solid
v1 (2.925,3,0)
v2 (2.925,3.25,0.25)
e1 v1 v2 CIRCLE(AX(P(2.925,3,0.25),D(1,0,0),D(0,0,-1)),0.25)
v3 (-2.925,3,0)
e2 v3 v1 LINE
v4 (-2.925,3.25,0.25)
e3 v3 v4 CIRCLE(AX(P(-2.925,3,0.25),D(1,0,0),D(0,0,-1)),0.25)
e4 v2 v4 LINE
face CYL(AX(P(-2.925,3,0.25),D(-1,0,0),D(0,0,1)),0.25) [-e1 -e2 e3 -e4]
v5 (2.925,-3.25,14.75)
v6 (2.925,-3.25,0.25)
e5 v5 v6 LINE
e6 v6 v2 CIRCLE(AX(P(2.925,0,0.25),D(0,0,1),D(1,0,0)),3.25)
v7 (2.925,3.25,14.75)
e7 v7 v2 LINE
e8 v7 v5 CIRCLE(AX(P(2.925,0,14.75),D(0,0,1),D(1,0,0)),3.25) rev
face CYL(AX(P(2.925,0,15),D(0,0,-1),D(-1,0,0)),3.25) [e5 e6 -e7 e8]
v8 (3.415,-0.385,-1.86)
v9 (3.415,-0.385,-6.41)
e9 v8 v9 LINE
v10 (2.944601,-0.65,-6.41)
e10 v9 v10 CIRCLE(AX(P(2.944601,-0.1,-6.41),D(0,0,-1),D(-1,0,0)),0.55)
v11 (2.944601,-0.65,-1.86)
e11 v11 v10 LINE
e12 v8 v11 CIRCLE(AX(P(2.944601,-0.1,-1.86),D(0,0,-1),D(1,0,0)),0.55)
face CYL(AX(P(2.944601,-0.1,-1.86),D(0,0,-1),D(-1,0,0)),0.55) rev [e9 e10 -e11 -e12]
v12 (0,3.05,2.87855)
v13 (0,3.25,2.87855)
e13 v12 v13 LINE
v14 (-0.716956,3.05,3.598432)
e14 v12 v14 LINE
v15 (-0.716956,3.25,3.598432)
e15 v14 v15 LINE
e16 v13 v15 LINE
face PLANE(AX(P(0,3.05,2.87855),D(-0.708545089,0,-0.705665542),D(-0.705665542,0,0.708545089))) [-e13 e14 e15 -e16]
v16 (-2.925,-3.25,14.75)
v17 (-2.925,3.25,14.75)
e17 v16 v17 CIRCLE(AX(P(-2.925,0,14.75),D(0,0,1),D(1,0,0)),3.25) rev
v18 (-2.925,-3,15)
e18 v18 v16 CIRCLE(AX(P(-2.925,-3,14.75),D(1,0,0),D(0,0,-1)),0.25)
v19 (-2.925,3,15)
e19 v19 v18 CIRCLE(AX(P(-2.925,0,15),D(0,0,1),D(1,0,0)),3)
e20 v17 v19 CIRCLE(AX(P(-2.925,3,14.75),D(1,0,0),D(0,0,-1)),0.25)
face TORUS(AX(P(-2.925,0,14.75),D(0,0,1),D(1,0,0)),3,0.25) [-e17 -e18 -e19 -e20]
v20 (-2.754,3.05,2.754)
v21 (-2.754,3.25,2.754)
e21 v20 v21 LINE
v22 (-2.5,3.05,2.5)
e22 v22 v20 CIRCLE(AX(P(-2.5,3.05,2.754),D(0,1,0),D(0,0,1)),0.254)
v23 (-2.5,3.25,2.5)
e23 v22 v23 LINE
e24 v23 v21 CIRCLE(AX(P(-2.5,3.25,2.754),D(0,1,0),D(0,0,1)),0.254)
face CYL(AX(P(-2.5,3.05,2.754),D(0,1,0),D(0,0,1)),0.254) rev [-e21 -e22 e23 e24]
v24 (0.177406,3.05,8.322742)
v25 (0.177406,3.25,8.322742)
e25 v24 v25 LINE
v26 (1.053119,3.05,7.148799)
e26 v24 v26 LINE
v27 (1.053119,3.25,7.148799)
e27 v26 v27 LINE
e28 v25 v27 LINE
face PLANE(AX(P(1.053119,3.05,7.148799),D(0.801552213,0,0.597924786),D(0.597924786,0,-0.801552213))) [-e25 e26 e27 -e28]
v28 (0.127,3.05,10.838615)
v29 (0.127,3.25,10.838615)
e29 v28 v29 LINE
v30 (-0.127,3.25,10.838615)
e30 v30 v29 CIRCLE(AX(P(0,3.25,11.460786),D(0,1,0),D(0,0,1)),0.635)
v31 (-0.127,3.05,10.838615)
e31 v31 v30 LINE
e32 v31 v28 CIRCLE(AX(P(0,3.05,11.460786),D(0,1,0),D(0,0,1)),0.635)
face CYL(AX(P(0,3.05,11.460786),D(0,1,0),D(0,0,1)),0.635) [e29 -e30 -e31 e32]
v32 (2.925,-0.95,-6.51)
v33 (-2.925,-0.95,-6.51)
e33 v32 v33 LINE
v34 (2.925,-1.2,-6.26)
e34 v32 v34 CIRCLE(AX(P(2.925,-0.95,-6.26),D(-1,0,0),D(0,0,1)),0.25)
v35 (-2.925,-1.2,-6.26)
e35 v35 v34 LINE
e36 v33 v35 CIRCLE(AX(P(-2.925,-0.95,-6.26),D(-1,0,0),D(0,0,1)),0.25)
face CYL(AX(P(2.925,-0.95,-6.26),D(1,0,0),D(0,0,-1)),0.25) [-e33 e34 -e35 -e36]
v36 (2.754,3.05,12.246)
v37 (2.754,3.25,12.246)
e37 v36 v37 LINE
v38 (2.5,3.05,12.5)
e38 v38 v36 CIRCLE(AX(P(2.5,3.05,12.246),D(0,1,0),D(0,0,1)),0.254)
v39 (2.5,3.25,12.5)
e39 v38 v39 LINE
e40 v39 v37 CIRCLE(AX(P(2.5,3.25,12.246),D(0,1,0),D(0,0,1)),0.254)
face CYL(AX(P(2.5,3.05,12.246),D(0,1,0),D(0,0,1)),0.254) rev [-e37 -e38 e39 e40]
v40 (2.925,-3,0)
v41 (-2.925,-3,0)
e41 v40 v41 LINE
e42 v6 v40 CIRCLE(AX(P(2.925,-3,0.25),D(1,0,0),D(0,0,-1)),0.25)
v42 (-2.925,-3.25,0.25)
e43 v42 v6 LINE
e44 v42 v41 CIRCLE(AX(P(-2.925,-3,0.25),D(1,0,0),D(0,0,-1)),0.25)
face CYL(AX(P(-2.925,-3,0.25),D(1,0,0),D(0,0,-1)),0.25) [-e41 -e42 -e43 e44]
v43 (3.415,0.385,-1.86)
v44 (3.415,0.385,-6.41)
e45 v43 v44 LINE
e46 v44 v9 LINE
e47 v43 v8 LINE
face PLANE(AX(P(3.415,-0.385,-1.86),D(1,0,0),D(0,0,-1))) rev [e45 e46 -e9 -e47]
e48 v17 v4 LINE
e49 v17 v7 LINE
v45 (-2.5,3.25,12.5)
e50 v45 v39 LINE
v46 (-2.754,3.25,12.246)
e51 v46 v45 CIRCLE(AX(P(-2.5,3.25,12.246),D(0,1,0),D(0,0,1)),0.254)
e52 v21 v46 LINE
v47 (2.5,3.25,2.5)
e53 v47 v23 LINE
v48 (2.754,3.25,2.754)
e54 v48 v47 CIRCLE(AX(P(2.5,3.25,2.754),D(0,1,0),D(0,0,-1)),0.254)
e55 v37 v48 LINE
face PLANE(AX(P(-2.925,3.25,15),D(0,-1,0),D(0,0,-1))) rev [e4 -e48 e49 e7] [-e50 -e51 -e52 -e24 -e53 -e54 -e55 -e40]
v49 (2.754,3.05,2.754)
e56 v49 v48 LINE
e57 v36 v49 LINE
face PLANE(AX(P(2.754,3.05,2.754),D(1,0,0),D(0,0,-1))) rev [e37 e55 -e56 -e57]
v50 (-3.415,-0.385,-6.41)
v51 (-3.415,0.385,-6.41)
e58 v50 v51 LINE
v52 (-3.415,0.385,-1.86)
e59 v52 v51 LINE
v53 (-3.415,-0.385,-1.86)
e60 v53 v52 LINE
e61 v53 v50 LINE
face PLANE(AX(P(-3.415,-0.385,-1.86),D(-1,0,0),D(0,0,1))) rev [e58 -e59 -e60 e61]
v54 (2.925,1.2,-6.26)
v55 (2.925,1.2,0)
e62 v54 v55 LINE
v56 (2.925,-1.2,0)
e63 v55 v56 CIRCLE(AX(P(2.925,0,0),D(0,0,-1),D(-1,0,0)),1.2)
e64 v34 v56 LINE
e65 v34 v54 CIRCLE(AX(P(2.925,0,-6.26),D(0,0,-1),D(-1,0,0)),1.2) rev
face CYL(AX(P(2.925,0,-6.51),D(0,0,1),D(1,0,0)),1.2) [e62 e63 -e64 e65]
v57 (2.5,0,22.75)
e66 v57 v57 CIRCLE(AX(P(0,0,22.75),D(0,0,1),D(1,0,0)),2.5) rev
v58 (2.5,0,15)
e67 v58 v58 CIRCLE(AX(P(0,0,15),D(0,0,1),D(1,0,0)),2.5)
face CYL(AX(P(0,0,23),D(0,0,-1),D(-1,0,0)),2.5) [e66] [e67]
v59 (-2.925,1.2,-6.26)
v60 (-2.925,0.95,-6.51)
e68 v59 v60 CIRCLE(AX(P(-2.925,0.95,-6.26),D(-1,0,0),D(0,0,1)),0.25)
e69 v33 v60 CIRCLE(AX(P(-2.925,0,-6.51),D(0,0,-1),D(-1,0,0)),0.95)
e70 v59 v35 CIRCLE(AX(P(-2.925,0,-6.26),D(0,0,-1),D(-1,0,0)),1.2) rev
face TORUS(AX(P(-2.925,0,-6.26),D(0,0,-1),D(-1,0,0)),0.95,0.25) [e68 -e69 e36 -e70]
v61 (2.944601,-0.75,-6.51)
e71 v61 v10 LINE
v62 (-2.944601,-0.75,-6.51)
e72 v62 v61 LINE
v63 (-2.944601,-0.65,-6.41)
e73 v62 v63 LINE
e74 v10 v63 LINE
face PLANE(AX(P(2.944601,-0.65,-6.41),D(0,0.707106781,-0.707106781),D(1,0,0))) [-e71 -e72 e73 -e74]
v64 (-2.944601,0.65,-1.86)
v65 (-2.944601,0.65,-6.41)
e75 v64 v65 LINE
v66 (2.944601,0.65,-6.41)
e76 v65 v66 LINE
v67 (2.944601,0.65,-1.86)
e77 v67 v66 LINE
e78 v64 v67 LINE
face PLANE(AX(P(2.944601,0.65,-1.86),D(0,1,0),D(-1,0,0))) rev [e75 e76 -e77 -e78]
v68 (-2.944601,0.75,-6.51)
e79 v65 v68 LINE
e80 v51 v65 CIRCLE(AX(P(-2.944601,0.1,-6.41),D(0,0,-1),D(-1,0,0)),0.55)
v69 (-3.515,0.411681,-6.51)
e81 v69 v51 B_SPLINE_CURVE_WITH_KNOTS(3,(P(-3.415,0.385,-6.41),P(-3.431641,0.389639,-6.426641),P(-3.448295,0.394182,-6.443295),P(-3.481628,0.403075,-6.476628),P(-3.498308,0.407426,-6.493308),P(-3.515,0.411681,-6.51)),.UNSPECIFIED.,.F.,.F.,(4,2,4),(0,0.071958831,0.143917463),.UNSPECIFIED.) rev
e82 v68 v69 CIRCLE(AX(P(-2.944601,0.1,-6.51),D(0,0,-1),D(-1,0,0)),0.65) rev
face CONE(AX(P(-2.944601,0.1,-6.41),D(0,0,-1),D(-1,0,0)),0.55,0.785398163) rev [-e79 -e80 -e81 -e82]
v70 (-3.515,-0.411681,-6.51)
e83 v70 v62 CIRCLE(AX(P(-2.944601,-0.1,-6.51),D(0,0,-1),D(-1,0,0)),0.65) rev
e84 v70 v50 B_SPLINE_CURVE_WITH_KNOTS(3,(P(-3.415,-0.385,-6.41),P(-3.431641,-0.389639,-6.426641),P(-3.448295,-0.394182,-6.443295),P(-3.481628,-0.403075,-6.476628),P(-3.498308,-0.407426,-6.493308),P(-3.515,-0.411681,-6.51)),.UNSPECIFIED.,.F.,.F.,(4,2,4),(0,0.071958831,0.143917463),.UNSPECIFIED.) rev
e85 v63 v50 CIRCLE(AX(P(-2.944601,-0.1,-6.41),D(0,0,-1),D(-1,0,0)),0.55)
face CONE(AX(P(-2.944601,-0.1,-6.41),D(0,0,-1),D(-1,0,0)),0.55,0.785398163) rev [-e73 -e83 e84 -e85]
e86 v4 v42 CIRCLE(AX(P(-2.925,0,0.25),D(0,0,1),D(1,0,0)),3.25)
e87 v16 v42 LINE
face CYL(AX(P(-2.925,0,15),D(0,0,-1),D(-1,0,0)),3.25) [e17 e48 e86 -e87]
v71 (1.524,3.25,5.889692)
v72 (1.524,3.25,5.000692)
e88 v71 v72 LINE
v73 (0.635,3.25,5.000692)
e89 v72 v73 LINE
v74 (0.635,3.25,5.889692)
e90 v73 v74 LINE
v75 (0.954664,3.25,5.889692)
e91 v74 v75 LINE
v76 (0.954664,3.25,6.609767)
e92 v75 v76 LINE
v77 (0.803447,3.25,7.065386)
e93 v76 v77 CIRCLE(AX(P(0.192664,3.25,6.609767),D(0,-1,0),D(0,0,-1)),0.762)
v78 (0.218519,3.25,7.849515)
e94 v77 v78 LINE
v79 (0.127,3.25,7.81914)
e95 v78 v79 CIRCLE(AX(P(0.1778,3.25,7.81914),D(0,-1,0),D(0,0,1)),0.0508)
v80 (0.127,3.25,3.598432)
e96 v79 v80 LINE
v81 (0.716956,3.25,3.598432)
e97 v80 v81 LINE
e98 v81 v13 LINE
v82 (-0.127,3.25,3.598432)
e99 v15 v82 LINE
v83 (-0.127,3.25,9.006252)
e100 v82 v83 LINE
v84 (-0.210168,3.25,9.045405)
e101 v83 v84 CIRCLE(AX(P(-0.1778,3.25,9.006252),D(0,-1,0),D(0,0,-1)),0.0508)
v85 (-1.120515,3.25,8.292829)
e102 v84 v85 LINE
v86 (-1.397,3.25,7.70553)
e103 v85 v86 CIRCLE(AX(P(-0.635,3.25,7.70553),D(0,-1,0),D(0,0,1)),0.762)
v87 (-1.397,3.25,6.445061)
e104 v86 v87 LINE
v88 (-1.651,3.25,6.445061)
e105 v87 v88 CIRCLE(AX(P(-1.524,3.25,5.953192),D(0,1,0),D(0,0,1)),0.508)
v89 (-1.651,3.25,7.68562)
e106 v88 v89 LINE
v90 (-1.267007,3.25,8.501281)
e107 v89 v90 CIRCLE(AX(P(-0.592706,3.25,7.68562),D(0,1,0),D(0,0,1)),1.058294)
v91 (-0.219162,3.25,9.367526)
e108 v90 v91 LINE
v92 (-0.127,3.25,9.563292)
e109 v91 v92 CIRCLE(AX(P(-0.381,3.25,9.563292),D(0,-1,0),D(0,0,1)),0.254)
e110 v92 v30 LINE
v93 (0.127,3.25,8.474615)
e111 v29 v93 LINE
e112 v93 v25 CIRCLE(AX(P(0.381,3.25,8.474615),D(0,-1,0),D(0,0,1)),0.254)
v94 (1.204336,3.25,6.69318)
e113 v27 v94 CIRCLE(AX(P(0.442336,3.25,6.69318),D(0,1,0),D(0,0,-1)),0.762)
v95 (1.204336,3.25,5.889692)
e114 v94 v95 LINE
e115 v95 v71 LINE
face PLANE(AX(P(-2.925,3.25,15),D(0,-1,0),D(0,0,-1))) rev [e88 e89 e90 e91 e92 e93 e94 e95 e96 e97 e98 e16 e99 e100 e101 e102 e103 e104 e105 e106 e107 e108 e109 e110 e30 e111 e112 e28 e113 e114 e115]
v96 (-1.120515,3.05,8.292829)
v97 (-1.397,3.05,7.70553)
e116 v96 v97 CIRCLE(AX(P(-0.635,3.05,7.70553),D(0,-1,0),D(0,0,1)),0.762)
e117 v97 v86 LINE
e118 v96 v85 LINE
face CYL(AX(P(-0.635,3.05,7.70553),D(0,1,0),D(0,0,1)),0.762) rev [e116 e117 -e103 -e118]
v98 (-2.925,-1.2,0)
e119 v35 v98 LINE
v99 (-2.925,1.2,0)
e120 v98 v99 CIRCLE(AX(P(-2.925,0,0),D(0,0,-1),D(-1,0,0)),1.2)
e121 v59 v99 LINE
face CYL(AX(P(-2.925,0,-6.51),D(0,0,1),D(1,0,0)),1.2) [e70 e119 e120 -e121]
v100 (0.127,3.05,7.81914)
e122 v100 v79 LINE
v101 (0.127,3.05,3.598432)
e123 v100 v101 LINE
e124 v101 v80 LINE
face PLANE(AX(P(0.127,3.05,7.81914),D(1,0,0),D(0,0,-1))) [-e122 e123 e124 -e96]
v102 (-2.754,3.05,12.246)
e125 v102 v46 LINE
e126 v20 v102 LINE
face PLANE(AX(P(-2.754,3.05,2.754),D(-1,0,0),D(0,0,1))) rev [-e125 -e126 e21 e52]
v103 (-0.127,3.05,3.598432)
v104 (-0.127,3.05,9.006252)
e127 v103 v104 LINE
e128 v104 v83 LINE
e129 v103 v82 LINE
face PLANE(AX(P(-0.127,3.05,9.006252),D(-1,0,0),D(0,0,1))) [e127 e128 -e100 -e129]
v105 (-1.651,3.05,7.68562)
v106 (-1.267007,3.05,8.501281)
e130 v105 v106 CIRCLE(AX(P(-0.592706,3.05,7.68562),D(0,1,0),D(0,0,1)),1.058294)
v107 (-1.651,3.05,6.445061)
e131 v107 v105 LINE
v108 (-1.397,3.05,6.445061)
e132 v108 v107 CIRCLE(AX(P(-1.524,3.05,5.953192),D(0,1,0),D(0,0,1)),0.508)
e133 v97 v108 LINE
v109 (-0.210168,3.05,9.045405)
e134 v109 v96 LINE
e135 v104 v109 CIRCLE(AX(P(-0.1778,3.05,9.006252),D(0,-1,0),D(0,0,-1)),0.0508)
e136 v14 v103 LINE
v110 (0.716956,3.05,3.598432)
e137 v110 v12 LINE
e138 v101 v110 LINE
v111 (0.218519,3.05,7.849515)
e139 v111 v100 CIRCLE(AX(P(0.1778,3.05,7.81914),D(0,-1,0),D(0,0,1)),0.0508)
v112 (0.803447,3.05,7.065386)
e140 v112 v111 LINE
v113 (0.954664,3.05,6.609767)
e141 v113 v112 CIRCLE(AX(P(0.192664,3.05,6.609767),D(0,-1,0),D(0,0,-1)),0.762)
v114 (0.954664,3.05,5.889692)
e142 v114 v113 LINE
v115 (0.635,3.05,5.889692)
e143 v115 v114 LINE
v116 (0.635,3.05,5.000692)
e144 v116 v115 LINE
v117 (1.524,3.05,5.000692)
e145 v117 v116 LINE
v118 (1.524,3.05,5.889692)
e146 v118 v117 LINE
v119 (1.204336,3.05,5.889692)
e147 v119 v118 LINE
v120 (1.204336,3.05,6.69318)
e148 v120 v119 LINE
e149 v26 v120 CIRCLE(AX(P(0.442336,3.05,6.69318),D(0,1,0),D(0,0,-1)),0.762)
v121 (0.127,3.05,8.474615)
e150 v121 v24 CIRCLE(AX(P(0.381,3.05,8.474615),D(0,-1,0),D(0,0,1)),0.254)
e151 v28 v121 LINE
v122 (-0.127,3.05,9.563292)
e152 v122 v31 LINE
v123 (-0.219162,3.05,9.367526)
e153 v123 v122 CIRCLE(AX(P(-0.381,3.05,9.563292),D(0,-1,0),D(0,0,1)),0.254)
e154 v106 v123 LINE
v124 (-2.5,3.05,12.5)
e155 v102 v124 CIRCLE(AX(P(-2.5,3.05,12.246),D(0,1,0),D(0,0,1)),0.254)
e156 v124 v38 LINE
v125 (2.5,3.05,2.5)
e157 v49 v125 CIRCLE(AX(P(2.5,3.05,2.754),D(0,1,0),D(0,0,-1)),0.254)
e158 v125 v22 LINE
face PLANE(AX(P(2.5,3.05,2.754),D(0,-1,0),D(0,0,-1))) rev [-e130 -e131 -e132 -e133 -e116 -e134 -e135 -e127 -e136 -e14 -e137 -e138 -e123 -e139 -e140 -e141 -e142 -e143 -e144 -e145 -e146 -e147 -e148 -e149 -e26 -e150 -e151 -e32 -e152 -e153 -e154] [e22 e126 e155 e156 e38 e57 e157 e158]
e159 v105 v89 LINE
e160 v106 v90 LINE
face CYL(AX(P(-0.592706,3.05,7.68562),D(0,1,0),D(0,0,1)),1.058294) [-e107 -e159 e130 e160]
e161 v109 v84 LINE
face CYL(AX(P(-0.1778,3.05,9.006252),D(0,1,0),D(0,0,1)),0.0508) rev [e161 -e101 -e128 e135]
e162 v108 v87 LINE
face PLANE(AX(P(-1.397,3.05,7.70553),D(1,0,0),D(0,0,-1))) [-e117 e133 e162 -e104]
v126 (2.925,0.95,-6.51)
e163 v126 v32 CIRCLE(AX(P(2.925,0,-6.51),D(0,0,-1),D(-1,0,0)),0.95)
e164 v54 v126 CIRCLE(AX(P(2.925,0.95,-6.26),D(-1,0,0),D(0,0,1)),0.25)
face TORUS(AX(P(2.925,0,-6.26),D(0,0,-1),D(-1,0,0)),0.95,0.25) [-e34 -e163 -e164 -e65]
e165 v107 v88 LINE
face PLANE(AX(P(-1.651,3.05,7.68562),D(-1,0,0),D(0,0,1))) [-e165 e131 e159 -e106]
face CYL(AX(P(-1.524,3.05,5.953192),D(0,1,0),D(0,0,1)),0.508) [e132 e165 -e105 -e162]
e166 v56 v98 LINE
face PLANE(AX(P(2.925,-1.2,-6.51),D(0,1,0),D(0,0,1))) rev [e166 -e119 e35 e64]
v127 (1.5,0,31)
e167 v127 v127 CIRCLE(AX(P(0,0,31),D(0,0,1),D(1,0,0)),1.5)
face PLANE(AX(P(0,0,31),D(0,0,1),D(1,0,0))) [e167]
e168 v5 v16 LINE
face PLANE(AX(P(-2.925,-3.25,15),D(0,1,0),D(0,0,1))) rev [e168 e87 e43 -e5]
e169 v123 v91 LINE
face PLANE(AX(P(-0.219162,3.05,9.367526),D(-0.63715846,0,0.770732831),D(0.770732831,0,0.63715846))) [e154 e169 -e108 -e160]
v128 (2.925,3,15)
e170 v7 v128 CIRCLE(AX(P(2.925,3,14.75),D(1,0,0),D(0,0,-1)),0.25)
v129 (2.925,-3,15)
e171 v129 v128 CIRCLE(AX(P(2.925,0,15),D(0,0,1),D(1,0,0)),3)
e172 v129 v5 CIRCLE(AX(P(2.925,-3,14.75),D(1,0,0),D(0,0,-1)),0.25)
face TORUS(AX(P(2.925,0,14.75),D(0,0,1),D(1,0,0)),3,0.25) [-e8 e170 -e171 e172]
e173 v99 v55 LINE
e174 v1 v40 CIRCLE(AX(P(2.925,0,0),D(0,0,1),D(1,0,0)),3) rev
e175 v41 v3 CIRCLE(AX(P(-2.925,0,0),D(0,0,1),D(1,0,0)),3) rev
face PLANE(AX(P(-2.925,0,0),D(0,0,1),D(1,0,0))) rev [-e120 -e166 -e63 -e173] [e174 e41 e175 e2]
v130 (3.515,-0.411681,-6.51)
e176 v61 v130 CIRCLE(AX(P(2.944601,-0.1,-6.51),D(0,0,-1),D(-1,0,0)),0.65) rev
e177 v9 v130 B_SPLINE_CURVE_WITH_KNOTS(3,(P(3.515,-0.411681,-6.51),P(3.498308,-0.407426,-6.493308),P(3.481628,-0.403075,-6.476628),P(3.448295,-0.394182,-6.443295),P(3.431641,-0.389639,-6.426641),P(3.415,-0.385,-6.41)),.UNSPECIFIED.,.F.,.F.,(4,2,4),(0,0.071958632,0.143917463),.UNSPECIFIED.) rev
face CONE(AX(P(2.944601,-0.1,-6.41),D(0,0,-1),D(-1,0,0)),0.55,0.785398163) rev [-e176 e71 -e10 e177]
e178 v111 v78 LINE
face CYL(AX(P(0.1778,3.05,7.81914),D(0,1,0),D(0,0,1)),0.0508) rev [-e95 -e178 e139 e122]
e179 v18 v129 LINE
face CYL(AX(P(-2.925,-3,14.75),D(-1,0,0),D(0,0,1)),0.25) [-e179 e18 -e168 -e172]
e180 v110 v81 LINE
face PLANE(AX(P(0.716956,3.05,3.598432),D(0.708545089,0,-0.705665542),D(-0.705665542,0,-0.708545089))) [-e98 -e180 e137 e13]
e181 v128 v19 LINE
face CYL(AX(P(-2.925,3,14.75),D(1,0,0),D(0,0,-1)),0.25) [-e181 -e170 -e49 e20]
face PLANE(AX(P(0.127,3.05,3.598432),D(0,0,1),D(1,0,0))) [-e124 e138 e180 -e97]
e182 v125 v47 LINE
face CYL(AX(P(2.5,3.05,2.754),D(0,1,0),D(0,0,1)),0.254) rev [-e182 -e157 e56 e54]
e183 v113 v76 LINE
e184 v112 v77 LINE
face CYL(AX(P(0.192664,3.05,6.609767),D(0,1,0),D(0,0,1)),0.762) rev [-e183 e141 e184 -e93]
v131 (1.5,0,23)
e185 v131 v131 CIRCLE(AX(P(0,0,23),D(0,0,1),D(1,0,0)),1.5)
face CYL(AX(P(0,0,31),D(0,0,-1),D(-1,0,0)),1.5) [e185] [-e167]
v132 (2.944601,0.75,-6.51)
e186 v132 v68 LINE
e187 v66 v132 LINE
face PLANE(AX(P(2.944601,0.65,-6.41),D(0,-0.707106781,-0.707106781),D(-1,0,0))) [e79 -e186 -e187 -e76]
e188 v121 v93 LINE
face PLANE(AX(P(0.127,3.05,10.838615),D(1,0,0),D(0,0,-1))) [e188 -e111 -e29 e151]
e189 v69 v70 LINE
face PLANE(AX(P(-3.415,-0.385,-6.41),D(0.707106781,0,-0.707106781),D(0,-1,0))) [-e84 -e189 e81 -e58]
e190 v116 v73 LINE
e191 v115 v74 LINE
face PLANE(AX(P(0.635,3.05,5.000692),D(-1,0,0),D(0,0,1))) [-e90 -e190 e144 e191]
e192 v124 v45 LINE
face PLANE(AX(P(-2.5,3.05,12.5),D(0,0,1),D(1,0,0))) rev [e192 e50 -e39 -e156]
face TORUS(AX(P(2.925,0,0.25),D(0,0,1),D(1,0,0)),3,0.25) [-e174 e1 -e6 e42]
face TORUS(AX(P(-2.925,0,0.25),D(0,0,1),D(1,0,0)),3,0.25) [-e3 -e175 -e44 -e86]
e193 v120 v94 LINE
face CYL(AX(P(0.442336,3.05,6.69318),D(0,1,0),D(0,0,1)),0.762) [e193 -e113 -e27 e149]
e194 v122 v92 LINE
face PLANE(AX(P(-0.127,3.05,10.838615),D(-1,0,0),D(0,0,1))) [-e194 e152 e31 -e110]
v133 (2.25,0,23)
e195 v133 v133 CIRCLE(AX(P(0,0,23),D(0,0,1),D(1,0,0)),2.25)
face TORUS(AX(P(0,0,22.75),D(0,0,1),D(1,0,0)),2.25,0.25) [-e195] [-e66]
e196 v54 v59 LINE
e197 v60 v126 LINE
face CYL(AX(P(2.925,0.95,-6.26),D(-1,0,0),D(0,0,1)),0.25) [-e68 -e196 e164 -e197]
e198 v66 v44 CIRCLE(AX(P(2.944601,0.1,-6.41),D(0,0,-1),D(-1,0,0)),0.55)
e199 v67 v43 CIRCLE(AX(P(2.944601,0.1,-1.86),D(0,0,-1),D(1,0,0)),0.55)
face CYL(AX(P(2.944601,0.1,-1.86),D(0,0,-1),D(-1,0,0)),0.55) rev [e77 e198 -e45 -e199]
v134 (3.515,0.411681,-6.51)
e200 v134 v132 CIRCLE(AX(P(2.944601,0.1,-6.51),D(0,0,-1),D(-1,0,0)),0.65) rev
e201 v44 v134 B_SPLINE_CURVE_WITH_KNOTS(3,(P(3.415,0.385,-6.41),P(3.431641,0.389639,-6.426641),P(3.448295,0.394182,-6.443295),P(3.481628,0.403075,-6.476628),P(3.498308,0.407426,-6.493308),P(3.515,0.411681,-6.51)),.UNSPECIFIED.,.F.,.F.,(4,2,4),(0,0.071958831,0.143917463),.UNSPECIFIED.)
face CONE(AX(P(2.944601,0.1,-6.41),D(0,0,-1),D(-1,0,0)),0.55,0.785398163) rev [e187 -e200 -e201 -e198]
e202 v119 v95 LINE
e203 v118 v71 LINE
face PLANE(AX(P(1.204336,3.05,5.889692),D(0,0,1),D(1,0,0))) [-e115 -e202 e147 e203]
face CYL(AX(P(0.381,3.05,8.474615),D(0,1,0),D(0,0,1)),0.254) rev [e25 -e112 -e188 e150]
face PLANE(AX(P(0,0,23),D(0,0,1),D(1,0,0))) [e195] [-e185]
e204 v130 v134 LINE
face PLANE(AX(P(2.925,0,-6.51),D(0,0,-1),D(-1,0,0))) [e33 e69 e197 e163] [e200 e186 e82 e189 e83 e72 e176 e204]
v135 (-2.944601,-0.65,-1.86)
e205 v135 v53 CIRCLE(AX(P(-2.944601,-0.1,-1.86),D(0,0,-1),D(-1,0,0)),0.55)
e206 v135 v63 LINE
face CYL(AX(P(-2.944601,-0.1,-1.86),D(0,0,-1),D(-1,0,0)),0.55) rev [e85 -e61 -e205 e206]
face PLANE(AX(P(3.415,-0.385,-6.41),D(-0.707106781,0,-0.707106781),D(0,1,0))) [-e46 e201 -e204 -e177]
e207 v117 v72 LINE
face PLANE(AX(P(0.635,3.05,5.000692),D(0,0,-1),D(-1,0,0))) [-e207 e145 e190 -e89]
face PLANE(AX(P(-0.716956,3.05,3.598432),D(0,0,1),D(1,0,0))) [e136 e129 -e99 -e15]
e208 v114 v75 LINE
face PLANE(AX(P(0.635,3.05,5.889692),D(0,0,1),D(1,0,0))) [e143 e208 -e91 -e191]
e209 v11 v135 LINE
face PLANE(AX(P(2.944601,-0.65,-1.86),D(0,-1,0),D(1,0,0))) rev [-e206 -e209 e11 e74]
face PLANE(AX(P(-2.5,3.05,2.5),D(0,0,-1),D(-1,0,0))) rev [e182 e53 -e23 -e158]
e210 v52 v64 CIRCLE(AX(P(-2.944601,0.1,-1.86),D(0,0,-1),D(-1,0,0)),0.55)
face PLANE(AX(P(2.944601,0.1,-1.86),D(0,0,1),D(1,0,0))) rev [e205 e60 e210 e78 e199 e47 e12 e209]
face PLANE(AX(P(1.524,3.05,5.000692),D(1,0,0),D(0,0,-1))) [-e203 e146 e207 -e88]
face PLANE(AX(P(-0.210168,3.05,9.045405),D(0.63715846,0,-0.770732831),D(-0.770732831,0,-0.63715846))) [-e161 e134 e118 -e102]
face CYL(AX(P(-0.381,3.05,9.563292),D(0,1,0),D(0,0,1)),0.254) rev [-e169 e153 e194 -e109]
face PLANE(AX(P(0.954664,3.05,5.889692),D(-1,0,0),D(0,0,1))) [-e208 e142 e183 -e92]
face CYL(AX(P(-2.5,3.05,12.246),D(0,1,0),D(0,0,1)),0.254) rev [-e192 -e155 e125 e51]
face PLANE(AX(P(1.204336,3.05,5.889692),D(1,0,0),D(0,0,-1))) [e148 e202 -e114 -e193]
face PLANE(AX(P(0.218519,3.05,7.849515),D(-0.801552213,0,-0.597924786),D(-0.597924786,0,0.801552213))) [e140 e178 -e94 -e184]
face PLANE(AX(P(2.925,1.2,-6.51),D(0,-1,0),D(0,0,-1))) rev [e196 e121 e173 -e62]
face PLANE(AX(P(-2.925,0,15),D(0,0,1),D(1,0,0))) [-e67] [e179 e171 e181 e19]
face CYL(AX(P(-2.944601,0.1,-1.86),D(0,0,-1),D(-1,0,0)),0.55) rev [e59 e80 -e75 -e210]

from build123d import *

# Parameters (mm, degrees)
EXTRUDE_1_DEPTH     = 15
EXTRUDE_2_DEPTH     = 6.51
CUT_EXTRUDE_1_DEPTH = 4.65
CHAMFER_1_SIZE      = 0.1
FILLET_1_R          = 0.25
CUT_EXTRUDE_2_DEPTH = 0.2
SKETCH_5_R          = 2.5
EXTRUDE_3_DEPTH     = 8
FILLET_2_R          = 0.25
SKETCH_6_R          = 1.5
EXTRUDE_4_DEPTH     = 8


with BuildPart() as part:
    # Эскиз1 → Бобышка-Вытянуть1 (new body)
    with BuildSketch(Plane.XY):
        with BuildLine():
            Line((-2.925, 3.25), (2.925, 3.25))
            ThreePointArc((2.925, 3.25), (6.175, 0), (2.925, -3.25))
            Line((2.925, -3.25), (-2.925, -3.25))
            ThreePointArc((-2.925, -3.25), (-6.175, 0), (-2.925, 3.25))
        make_face()
    extrude(amount=EXTRUDE_1_DEPTH)

    # Эскиз2 → Бобышка-Вытянуть2 (add)
    with BuildSketch(Plane(origin=(0, 0, 0), x_dir=(-1, 0, 0), z_dir=(0, 0, -1))):
        with BuildLine():
            Line((-2.925, 1.2), (2.925, 1.2))
            ThreePointArc((2.925, 1.2), (4.125, 0), (2.925, -1.2))
            Line((2.925, -1.2), (-2.925, -1.2))
            ThreePointArc((-2.925, -1.2), (-4.125, 0), (-2.925, 1.2))
        make_face()
    extrude(amount=EXTRUDE_2_DEPTH)

    # Эскиз3 → Вырез-Вытянуть1 (cut)
    with BuildSketch(Plane(origin=(0, 0, -6.51), x_dir=(-1, 0, 0), z_dir=(0, 0, -1))):
        with BuildLine():
            Line((-2.944601233, -0.65), (2.944601233, -0.65))
            ThreePointArc((2.944601233, -0.65), (3.214554933, -0.579192028), (3.415, -0.385))
            Line((3.415, -0.385), (3.415, 0.385))
            ThreePointArc((3.415, 0.385), (3.214554933, 0.579192028), (2.944601233, 0.65))
            Line((2.944601233, 0.65), (-2.944601233, 0.65))
            ThreePointArc((-2.944601233, 0.65), (-3.214554933, 0.579192028), (-3.415, 0.385))
            Line((-3.415, 0.385), (-3.415, -0.385))
            ThreePointArc((-3.415, -0.385), (-3.214554933, -0.579192028), (-2.944601233, -0.65))
        make_face()
    extrude(amount=-CUT_EXTRUDE_1_DEPTH, mode=Mode.SUBTRACT)

    # Фаска1
    chamfer_1_edges = [part.edges().sort_by_distance(p)[0] for p in [
        (3.214554933, -0.579192028, -6.51),
        (-3.214554933, -0.579192028, -6.51),
        (0, -0.65, -6.51),
    ]]
    chamfer(chamfer_1_edges, length=CHAMFER_1_SIZE)
    chamfer_1_2_edges = [part.edges().sort_by_distance(p)[0] for p in [
        (3.214554933, 0.579192028, -6.51),
        (0, 0.65, -6.51),
        (-3.214554933, 0.579192028, -6.51),
    ]]
    chamfer(chamfer_1_2_edges, length=CHAMFER_1_SIZE)
    chamfer_1_3_edges = [part.edges().sort_by_distance(p)[0] for p in [
        (-3.415, 0, -6.51),
    ]]
    chamfer(chamfer_1_3_edges, length=CHAMFER_1_SIZE - 0.0001)  # a hair under: the kernel refuses the full size
    chamfer_1_4_edges = [part.edges().sort_by_distance(p)[0] for p in [
        (3.415, 0, -6.51),
    ]]
    chamfer(chamfer_1_4_edges, length=CHAMFER_1_SIZE)

    # Скругление1
    fillet_1_edges = [part.edges().sort_by_distance(p)[0] for p in [
        (4.125, 0, -6.51),
        (0, -1.2, -6.51),
        (-4.125, 0, -6.51),
        (0, 1.2, -6.51),
    ]]
    fillet(fillet_1_edges, radius=FILLET_1_R)

    # Эскиз4 → Вырез-Вытянуть2 (cut)
    with BuildSketch(Plane(origin=(0, 3.25, 0), x_dir=(1, 0, 0), z_dir=(0, 1, 0))):
        with BuildLine():
            Line((-2.5, -2.5), (2.5, -2.5))
            ThreePointArc((2.5, -2.5), (2.679605122, -2.574394878), (2.754, -2.754))
            Line((2.754, -2.754), (2.754, -12.246))
            ThreePointArc((2.754, -12.246), (2.679605122, -12.425605122), (2.5, -12.5))
            Line((2.5, -12.5), (-2.5, -12.5))
            ThreePointArc((-2.5, -12.5), (-2.679605122, -12.425605122), (-2.754, -12.246))
            Line((-2.754, -12.246), (-2.754, -2.754))
            ThreePointArc((-2.754, -2.754), (-2.679605122, -2.574394878), (-2.5, -2.5))
        make_face()
        with BuildLine():
            Line((0, -2.878550244), (-0.716956191, -3.598432054))
            Line((-0.716956191, -3.598432054), (-0.127, -3.598432054))
            Line((-0.127, -3.598432054), (-0.127, -9.006251958))
            ThreePointArc((-0.127, -9.006251958), (-0.156162493, -9.052213445), (-0.21016765, -9.045405185))
            Line((-0.21016765, -9.045405185), (-1.120514747, -8.292828766))
            ThreePointArc((-1.120514747, -8.292828766), (-1.324422308, -8.030092949), (-1.397, -7.705530349))
            Line((-1.397, -7.705530349), (-1.397, -6.445060748))
            ThreePointArc((-1.397, -6.445060748), (-1.524, -5.445191863), (-1.651, -6.445060748))
            Line((-1.651, -6.445060748), (-1.651, -7.68561956))
            ThreePointArc((-1.651, -7.68561956), (-1.550201428, -8.136384053), (-1.267007097, -8.501281232))
            Line((-1.267007097, -8.501281232), (-0.219161751, -9.367526318))
            ThreePointArc((-0.219161751, -9.367526318), (-0.151192564, -9.455104923), (-0.127, -9.563292457))
            Line((-0.127, -9.563292457), (-0.127, -10.838615444))
            ThreePointArc((-0.127, -10.838615444), (0, -12.095785839), (0.127, -10.838615444))
            Line((0.127, -10.838615444), (0.127, -8.47461517))
            ThreePointArc((0.127, -8.47461517), (0.139930568, -8.394605616), (0.177405738, -8.322742274))
            Line((0.177405738, -8.322742274), (1.053118903, -7.148798926))
            ThreePointArc((1.053118903, -7.148798926), (1.165544414, -6.933208901), (1.204336117, -6.693180239))
            Line((1.204336117, -6.693180239), (1.204336117, -5.889691863))
            Line((1.204336117, -5.889691863), (1.524, -5.889691863))
            Line((1.524, -5.889691863), (1.524, -5.000691863))
            Line((1.524, -5.000691863), (0.635, -5.000691863))
            Line((0.635, -5.000691863), (0.635, -5.889691863))
            Line((0.635, -5.889691863), (0.954663883, -5.889691863))
            Line((0.954663883, -5.889691863), (0.954663883, -6.609767291))
            ThreePointArc((0.954663883, -6.609767291), (0.915872181, -6.849795953), (0.80344667, -7.065385978))
            Line((0.80344667, -7.065385978), (0.218518852, -7.849515015))
            ThreePointArc((0.218518852, -7.849515015), (0.161798089, -7.867354322), (0.127, -7.819140435))
            Line((0.127, -7.819140435), (0.127, -3.598432054))
            Line((0.127, -3.598432054), (0.716956191, -3.598432054))
            Line((0.716956191, -3.598432054), (0, -2.878550244))
        make_face(mode=Mode.SUBTRACT)
    extrude(amount=-CUT_EXTRUDE_2_DEPTH, mode=Mode.SUBTRACT)

    # Эскиз5 → Бобышка-Вытянуть3 (add)
    with BuildSketch(Plane.XY.offset(15)):
        Circle(SKETCH_5_R)
    extrude(amount=EXTRUDE_3_DEPTH)

    # Скругление2
    fillet_2_edges = [part.edges().sort_by_distance(p)[0] for p in [
        (6.175, 0, 15),
        (0, 3.25, 15),
        (-2.5, 0, 23),
        (-6.175, 0, 15),
        (0, 3.25, 0),
        (6.175, 0, 0),
        (0, -3.25, 0),
        (-6.175, 0, 0),
        (0, -3.25, 15),
    ]]
    fillet(fillet_2_edges, radius=FILLET_2_R)

    # Эскиз6 → Бобышка-Вытянуть4 (add)
    with BuildSketch(Plane.XY.offset(23)):
        Circle(SKETCH_6_R)
    extrude(amount=EXTRUDE_4_DEPTH)


solid = part.part
